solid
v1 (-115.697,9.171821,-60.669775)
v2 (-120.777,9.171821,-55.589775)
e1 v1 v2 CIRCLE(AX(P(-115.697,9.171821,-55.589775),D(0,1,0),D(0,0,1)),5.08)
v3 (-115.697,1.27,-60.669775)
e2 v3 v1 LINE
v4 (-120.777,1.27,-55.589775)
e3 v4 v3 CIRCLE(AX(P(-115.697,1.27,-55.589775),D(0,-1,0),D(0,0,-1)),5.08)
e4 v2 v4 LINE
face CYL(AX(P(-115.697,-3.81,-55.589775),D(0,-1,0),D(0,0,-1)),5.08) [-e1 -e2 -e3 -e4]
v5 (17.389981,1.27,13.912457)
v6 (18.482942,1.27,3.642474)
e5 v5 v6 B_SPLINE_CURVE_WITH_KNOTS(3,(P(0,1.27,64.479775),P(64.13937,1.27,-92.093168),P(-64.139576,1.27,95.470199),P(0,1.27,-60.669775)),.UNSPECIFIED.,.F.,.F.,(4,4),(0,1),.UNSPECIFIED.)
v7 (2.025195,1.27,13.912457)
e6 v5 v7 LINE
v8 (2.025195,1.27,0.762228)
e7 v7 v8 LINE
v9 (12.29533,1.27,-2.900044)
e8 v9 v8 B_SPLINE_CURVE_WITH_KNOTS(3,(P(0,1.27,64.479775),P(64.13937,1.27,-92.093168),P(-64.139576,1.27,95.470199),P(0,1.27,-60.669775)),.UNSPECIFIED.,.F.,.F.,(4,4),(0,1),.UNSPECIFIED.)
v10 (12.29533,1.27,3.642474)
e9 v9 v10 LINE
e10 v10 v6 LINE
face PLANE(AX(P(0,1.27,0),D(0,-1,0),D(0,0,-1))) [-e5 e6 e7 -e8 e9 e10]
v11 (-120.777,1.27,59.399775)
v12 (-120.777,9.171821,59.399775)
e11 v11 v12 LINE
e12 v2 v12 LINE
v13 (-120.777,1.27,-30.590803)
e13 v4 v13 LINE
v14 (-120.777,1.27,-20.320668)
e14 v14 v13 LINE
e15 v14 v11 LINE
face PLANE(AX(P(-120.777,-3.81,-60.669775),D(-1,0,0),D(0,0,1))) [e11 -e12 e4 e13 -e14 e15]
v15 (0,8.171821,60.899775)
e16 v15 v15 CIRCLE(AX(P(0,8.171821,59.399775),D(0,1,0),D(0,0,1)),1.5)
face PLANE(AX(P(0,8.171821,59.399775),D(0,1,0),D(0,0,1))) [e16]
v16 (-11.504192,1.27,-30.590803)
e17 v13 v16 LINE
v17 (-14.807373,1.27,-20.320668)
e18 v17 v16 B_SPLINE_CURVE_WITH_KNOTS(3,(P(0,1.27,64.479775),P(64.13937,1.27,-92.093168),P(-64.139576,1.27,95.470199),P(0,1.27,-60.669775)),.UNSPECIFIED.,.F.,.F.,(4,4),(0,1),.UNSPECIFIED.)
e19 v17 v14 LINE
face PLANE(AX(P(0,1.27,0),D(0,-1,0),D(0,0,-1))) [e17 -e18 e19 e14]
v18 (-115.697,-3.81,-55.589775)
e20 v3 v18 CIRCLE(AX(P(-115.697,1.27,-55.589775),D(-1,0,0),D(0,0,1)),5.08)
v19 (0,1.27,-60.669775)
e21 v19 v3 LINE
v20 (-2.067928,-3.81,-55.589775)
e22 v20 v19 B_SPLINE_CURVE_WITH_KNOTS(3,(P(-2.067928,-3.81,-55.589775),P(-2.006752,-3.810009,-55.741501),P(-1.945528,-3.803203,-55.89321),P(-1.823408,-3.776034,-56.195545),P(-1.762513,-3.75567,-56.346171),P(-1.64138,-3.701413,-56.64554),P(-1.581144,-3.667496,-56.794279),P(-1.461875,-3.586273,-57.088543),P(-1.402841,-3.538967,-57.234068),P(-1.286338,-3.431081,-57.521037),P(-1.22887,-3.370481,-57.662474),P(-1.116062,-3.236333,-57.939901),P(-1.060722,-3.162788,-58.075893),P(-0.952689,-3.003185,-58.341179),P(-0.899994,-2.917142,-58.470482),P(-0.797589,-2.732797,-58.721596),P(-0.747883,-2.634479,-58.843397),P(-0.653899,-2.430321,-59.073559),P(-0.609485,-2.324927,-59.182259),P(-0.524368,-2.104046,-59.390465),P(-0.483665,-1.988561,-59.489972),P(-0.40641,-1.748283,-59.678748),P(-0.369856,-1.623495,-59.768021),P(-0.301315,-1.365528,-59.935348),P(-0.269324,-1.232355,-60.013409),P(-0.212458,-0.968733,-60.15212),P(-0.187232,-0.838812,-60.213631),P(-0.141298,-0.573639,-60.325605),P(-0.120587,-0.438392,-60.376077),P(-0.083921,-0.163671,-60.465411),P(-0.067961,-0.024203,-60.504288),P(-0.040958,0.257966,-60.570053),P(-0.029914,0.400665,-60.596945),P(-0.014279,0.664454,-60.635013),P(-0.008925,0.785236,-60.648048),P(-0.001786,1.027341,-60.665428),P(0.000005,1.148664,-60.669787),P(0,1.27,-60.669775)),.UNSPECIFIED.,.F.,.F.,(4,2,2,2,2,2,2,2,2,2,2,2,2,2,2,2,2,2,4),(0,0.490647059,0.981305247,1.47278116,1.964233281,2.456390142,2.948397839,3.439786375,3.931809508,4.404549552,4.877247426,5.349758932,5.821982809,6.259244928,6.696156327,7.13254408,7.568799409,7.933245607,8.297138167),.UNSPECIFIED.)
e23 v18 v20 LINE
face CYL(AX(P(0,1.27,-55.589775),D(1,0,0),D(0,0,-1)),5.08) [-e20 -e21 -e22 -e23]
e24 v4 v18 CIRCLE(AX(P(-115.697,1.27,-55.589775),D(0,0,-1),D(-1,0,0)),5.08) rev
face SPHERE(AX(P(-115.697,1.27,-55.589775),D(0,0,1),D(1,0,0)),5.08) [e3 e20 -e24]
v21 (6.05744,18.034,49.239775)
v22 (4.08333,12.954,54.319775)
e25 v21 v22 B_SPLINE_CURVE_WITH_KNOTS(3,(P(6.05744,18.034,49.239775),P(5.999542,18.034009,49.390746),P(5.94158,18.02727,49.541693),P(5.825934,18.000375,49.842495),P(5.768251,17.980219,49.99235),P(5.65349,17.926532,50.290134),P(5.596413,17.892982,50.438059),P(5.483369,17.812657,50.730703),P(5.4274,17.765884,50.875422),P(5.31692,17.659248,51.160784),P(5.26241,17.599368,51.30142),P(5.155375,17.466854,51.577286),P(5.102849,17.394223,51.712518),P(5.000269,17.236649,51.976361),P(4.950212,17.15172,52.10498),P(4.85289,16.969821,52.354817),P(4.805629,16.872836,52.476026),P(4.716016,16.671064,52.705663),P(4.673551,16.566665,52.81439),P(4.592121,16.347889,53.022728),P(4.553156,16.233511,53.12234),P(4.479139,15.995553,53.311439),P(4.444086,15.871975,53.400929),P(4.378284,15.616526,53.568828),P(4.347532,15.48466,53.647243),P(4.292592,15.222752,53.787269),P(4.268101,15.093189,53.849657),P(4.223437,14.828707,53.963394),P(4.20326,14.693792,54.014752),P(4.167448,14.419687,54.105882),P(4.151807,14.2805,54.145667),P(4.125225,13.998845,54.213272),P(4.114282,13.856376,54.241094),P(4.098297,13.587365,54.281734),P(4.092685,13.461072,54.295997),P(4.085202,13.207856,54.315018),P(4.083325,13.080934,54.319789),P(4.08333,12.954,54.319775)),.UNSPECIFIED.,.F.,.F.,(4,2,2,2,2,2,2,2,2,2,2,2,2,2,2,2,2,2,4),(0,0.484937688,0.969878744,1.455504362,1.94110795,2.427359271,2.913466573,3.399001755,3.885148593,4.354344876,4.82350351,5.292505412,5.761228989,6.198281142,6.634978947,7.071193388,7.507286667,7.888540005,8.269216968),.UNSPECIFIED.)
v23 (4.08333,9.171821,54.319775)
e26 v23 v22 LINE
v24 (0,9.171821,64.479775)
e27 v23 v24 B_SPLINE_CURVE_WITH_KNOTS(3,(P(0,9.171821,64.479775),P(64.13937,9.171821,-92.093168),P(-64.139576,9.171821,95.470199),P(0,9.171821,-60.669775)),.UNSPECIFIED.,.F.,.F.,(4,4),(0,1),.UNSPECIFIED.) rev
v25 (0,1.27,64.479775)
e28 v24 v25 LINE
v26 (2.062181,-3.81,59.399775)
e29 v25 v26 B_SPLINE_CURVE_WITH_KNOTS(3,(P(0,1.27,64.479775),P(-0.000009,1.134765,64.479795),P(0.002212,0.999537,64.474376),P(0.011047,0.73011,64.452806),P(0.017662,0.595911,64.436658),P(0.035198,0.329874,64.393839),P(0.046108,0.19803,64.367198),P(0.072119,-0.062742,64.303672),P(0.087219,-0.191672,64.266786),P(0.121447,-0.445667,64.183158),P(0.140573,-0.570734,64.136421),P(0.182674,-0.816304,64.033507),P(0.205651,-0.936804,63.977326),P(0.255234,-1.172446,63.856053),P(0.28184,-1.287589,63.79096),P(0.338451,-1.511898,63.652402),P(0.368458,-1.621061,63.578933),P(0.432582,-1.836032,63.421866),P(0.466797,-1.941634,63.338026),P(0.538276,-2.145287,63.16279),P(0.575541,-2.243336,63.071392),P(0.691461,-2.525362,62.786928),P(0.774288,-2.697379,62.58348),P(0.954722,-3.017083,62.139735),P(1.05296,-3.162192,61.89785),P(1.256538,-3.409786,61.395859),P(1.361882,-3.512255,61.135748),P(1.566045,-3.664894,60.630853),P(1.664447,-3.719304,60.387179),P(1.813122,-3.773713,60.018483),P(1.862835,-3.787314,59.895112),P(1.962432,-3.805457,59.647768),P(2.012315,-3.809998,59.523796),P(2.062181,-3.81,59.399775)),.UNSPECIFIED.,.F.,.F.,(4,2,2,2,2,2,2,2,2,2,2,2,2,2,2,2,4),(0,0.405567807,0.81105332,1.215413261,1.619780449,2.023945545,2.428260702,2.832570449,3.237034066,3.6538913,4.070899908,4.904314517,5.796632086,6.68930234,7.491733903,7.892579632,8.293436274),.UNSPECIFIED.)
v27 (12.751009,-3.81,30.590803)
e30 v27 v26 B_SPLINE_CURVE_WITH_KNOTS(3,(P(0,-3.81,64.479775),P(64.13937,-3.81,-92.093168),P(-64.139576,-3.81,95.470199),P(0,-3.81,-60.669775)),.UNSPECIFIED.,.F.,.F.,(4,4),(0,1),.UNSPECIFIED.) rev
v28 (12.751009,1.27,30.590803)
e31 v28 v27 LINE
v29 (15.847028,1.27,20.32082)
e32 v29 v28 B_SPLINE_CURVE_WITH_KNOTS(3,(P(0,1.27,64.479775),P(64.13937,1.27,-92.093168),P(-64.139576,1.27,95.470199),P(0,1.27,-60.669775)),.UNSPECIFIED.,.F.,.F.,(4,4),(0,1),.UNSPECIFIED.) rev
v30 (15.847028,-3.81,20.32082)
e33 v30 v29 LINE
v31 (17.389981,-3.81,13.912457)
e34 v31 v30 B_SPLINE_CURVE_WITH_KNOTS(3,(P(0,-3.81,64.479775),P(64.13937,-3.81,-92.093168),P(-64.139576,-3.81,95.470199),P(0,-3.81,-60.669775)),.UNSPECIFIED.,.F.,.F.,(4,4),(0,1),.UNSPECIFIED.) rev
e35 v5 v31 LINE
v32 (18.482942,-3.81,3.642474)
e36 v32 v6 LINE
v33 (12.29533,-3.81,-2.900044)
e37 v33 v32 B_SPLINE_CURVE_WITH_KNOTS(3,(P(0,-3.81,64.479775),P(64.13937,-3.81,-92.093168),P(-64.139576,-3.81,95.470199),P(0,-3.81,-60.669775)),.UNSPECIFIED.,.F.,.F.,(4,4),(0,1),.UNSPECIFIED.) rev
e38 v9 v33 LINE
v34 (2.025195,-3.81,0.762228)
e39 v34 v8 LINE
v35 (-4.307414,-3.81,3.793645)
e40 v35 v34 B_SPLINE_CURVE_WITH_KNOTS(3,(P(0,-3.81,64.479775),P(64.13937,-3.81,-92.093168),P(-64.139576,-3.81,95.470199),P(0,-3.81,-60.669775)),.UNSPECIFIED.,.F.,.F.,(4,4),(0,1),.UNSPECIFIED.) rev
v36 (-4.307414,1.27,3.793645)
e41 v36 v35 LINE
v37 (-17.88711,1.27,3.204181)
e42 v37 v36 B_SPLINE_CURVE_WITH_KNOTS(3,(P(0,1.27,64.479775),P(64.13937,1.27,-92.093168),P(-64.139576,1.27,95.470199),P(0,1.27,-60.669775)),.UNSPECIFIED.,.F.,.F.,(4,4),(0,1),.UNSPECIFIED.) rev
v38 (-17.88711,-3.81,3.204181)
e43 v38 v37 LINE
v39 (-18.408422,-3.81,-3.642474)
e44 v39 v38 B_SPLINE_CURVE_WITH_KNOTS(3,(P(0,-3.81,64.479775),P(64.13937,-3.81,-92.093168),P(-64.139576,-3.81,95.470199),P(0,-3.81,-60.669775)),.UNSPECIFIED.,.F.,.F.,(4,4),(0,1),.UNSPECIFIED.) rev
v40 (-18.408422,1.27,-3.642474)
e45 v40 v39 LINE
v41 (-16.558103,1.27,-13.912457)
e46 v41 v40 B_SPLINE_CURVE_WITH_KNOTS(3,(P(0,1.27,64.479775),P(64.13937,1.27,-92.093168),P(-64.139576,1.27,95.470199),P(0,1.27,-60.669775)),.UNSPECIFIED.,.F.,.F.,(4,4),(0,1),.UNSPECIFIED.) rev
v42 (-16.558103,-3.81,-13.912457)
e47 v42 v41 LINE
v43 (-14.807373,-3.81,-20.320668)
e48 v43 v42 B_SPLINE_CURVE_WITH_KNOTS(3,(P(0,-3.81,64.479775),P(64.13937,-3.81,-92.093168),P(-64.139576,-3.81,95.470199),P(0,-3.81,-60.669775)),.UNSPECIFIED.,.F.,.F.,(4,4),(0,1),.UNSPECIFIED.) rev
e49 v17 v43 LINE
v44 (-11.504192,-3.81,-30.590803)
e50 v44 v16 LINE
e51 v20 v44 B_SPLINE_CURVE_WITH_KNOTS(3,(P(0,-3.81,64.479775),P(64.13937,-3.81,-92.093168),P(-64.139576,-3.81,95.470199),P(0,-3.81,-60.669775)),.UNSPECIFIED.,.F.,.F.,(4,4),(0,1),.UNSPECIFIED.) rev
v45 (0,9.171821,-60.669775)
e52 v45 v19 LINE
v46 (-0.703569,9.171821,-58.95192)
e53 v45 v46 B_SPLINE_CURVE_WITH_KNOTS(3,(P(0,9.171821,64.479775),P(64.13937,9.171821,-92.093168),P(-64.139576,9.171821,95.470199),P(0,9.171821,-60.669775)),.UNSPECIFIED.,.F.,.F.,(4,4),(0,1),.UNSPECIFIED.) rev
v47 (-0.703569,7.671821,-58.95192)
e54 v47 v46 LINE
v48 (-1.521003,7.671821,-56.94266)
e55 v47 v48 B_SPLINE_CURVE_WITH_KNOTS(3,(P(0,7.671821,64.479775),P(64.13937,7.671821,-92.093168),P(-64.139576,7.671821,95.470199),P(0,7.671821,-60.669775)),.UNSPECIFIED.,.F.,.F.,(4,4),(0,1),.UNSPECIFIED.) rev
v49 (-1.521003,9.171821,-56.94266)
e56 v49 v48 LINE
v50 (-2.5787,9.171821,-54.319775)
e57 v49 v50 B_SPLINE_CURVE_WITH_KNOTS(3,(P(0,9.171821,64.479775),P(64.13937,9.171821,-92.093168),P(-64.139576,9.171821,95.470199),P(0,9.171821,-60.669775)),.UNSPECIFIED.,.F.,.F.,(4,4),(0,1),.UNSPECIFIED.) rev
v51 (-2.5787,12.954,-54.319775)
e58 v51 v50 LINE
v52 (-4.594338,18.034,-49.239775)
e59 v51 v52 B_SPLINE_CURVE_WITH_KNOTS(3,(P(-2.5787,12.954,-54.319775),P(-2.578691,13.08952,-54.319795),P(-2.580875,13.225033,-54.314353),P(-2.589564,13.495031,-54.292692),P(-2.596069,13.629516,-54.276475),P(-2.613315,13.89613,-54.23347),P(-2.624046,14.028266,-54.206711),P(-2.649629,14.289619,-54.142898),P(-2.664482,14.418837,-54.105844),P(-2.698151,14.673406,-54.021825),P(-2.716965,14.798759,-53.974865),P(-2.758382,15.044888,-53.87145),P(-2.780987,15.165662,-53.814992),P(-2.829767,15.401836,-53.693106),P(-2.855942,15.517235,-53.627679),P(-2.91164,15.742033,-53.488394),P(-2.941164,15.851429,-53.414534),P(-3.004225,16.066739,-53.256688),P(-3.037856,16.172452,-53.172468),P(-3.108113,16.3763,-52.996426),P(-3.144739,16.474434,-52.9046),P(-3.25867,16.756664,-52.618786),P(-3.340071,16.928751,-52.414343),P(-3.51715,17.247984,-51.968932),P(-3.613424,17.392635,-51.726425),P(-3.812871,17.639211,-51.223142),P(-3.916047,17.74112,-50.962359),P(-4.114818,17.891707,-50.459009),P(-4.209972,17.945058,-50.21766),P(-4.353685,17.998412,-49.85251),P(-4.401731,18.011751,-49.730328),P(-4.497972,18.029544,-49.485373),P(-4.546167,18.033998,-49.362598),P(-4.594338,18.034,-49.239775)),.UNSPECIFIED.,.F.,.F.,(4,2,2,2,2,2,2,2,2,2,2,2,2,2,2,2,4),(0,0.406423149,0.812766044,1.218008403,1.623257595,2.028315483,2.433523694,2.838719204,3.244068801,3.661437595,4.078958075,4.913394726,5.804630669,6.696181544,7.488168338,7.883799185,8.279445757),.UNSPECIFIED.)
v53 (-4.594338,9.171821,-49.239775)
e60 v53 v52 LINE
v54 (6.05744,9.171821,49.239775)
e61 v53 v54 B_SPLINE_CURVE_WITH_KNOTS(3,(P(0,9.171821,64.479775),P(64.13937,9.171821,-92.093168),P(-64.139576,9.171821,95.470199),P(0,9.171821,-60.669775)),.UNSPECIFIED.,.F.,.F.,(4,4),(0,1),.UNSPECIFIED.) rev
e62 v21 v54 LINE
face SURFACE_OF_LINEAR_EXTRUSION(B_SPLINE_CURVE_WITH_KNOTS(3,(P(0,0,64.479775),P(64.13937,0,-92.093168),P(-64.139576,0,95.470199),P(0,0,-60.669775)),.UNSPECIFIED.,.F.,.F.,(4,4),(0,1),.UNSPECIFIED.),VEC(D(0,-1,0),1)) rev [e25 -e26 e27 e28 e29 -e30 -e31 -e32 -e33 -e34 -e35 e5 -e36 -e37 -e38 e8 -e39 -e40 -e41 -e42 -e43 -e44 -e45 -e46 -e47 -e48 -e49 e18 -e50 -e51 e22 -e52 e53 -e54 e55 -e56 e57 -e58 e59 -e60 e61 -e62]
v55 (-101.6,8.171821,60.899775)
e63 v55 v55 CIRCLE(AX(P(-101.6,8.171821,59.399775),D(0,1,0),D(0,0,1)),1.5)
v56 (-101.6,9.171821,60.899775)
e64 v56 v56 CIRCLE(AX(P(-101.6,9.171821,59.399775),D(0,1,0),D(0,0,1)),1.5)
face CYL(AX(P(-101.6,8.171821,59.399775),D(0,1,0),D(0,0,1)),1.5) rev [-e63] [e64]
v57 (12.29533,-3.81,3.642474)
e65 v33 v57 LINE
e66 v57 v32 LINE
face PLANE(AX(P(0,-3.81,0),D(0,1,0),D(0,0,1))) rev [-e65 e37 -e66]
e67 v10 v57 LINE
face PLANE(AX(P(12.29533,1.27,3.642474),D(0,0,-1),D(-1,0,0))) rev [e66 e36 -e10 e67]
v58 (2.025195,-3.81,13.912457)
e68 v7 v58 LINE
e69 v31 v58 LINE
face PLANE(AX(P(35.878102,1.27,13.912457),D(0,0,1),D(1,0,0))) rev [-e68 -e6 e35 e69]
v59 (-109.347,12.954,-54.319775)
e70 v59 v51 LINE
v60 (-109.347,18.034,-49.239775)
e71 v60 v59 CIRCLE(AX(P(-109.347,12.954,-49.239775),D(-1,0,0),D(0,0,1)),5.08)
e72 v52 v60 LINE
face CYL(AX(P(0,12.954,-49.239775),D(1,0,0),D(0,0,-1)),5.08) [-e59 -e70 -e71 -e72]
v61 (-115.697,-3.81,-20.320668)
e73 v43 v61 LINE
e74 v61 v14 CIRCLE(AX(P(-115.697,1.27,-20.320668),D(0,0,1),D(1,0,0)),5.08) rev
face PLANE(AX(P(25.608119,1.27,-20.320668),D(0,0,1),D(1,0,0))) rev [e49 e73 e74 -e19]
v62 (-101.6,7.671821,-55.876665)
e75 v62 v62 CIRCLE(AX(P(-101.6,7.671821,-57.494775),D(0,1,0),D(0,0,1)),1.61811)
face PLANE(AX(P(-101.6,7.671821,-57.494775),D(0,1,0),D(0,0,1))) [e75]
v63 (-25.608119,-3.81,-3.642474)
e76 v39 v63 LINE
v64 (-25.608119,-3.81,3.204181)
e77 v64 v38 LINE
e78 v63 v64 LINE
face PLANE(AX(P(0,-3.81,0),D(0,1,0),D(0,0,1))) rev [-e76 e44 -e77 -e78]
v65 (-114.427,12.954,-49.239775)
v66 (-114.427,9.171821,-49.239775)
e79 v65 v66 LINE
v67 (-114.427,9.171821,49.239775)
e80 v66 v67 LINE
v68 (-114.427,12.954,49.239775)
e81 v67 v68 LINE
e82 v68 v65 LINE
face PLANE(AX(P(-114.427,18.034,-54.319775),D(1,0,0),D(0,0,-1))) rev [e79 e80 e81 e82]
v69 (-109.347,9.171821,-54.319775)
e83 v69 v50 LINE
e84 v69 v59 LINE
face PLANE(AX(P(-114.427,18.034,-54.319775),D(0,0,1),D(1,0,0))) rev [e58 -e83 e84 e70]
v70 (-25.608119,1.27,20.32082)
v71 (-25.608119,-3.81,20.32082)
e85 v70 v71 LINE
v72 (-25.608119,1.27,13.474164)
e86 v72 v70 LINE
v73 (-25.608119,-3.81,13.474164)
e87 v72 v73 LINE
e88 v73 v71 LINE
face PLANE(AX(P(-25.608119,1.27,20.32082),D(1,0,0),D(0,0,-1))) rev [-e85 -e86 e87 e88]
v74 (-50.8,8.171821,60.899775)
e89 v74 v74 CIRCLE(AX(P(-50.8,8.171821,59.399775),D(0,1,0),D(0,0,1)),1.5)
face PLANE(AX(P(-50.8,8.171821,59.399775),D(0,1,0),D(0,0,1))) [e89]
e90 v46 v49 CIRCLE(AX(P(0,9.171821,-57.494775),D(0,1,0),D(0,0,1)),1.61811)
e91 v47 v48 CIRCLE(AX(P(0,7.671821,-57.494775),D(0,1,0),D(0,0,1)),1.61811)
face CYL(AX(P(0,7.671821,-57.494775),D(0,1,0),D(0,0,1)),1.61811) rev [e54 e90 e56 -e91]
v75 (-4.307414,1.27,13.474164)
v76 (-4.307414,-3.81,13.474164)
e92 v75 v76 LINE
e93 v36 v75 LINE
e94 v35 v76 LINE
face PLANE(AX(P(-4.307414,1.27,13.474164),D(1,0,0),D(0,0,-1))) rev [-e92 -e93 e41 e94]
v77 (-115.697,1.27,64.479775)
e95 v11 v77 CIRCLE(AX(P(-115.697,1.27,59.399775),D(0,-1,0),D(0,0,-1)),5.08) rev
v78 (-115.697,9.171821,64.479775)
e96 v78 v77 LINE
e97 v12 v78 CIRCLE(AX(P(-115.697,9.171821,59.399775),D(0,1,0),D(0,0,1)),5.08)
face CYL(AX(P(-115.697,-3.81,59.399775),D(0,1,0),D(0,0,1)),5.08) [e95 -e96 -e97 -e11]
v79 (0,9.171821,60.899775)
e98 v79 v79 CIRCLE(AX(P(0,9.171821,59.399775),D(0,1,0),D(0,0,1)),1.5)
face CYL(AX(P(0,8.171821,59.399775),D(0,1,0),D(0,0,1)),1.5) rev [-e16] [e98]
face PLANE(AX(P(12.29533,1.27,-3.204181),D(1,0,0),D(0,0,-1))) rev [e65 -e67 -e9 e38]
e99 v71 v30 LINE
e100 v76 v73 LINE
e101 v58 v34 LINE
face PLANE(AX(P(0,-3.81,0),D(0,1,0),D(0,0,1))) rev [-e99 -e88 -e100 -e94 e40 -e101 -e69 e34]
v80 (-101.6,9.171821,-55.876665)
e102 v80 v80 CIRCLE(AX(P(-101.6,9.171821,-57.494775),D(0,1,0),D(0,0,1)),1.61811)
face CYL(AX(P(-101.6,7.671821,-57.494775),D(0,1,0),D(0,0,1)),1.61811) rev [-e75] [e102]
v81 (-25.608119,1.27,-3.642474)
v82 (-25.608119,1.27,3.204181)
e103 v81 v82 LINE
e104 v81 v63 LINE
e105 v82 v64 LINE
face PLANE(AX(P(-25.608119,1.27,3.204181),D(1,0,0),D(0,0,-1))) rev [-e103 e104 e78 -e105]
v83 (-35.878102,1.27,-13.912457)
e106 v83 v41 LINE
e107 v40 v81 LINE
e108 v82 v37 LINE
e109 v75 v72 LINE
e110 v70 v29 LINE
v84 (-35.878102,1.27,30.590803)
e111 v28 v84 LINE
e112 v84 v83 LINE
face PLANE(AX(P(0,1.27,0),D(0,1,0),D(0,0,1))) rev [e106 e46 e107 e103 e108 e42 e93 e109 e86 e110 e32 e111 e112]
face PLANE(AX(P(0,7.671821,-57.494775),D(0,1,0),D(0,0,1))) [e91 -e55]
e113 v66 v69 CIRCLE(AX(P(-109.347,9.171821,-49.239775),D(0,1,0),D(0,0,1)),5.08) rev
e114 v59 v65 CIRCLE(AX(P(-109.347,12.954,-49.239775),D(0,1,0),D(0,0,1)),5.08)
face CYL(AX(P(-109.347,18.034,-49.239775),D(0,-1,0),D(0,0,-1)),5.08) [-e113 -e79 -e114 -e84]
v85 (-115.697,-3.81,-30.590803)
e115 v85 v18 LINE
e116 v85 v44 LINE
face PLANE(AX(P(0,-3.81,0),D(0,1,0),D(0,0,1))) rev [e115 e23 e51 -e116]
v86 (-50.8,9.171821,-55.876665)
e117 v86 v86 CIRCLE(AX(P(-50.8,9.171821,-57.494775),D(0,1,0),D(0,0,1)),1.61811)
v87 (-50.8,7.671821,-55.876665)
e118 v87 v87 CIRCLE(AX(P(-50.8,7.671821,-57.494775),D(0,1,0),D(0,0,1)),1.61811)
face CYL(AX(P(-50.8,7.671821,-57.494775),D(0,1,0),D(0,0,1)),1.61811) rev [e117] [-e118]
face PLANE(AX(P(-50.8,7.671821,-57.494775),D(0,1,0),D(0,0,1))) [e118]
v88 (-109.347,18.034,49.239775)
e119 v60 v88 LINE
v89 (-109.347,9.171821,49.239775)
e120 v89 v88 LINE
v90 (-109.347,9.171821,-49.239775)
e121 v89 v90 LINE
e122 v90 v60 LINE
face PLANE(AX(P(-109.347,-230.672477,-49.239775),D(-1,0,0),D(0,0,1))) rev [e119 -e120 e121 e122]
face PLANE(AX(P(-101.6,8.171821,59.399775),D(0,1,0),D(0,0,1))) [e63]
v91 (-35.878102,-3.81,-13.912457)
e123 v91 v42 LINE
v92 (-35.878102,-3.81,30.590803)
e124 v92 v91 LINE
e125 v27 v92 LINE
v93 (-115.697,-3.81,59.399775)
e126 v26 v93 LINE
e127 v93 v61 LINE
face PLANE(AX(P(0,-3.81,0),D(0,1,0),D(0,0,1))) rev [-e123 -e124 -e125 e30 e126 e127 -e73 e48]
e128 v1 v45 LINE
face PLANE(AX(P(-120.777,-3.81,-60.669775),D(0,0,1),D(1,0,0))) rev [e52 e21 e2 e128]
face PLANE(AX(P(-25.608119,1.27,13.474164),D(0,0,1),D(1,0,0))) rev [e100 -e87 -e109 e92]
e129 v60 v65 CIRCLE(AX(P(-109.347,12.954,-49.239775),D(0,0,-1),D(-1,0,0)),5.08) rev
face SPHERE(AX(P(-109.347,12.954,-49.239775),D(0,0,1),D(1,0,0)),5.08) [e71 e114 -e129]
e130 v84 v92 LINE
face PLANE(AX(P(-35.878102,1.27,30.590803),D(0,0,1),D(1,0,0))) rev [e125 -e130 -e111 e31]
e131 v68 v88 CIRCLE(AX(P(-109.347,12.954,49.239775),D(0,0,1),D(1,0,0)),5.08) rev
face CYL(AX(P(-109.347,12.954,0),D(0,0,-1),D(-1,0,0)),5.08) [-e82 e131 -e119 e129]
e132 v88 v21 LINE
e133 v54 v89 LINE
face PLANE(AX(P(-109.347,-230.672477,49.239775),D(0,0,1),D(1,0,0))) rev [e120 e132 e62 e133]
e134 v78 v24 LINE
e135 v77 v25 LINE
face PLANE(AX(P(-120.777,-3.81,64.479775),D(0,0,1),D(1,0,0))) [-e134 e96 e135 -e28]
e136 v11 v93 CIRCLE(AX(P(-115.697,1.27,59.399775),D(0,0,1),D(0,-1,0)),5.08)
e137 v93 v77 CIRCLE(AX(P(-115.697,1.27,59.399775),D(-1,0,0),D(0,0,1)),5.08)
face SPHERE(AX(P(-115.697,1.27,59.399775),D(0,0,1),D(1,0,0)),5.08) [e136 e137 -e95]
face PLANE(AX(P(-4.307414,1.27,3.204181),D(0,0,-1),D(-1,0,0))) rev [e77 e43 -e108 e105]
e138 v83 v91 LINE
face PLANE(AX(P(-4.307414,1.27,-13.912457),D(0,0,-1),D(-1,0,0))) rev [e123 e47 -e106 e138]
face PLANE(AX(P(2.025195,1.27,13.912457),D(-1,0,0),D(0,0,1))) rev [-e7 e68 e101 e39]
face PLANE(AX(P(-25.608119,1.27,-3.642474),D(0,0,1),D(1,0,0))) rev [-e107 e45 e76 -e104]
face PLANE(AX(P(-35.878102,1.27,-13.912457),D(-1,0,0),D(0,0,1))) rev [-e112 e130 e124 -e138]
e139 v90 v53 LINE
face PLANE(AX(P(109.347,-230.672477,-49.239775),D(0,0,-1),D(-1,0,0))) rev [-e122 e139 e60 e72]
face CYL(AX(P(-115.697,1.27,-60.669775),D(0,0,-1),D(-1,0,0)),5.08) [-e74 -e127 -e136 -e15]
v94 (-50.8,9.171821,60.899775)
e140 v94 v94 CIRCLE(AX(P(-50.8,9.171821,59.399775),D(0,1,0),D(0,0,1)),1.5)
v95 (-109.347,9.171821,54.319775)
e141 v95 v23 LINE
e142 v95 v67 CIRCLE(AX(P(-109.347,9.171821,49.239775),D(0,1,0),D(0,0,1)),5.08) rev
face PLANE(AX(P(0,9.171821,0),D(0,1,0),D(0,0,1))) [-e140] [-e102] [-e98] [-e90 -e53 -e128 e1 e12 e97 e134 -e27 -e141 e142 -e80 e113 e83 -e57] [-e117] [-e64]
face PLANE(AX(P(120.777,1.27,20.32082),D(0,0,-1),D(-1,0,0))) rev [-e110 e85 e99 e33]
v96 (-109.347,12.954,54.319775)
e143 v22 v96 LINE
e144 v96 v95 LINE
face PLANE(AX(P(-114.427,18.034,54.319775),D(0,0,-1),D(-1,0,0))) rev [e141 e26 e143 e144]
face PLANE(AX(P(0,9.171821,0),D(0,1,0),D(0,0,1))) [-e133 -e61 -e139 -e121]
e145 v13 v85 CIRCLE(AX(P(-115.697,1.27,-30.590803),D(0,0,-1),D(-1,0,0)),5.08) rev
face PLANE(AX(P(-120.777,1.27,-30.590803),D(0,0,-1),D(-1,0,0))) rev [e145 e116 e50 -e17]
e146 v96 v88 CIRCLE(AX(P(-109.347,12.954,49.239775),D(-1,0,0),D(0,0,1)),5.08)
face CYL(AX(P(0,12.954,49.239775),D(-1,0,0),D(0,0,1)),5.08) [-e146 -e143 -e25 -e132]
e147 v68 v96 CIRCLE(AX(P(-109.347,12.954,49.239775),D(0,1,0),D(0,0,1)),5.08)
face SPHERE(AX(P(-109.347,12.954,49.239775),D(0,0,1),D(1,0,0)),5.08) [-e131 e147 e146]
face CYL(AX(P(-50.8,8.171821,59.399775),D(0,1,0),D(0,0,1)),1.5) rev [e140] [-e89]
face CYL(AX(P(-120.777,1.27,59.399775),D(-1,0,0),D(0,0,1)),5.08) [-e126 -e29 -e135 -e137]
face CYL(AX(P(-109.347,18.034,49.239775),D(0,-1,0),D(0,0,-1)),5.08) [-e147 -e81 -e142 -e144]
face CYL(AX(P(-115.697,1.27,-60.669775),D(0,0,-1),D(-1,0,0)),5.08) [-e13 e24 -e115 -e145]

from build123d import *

# Parameters (mm, degrees)
SKETCH1_14_W         = 241.554
SKETCH1_14_H         = 125.149549896
BOSS_EXTRUDE9_DEPTH  = 3.81
SKETCH1_W            = 241.554
SKETCH1_H            = 125.149549896
SKETCH1_W_2          = 228.854
SKETCH1_H_2          = 108.639549896
BOSS_EXTRUDE10_DEPTH = 9.171821007
SKETCH29_R           = 1.61811024
CUT_EXTRUDE12_DEPTH  = 1.5
LPATTERN24_COUNT     = 3
LPATTERN24_PITCH     = 50.8
LPATTERN25_COUNT     = 3
LPATTERN25_PITCH     = 50.8
SKETCH30_R           = 1.5
CUT_EXTRUDE13_DEPTH  = 1
LPATTERN26_COUNT     = 3
LPATTERN26_PITCH     = 50.8
LPATTERN27_COUNT     = 3
LPATTERN27_PITCH     = 50.8
SKETCH37_W           = 228.854
SKETCH37_H           = 108.639549896
BOSS_EXTRUDE12_DEPTH = 18.034
FILLET7_R            = 5.08
SKETCH38_W           = 218.694
SKETCH38_H           = 98.479549896
CUT_EXTRUDE14_DEPTH  = 8.862178993
CUT_EXTRUDE15_DEPTH  = 5.08
SURFACECUT1_START    = -3.81
SURFACECUT1_DEPTH    = 21.844


# Read off the part's stored shape, not the designer's step: SurfaceCut1
with BuildPart() as part:
    # Sketch1<14> → Boss-Extrude9 (new body)
    with BuildSketch(Plane(origin=(0, 0, 0), x_dir=(1, 0, 0), z_dir=(0, 1, 0))):
        with Locations((0, -1.905)):
            Rectangle(SKETCH1_14_W, SKETCH1_14_H)
    extrude(amount=-BOSS_EXTRUDE9_DEPTH)

    # Sketch1 → Boss-Extrude10 (add)
    with BuildSketch(Plane(origin=(0, 0, 0), x_dir=(1, 0, 0), z_dir=(0, 1, 0))):
        with Locations((0, -1.905)):
            Rectangle(SKETCH1_W, SKETCH1_H)
        Rectangle(SKETCH1_W_2, SKETCH1_H_2, mode=Mode.SUBTRACT)
    extrude(amount=BOSS_EXTRUDE10_DEPTH)

    # Sketch29 → Cut-Extrude12 (cut)
    with BuildSketch(Plane(origin=(0, 9.171821007, 0), x_dir=(1, 0, 0), z_dir=(0, 1, 0))):
        with Locations(Location((0, 57.494774948, 0), (0, 0, 270))):
            Circle(SKETCH29_R)
    cut_extrude12 = extrude(amount=-CUT_EXTRUDE12_DEPTH, mode=Mode.SUBTRACT)

    # LPattern24: Cut-Extrude12 ×3
    with Locations(*[(-i * LPATTERN24_PITCH, 0, 0) for i in range(1, LPATTERN24_COUNT)]):
        add(cut_extrude12, mode=Mode.SUBTRACT)

    # LPattern25: Cut-Extrude12 ×3
    with Locations(*[(i * LPATTERN25_PITCH, 0, 0) for i in range(1, LPATTERN25_COUNT)]):
        add(cut_extrude12, mode=Mode.SUBTRACT)

    # Sketch30 → Cut-Extrude13 (cut)
    with BuildSketch(Plane(origin=(0, 9.171821007, 0), x_dir=(1, 0, 0), z_dir=(0, 1, 0))):
        with Locations(Location((0, -59.399774948, 0), (0, 0, 270))):
            Circle(SKETCH30_R)
    cut_extrude13 = extrude(amount=-CUT_EXTRUDE13_DEPTH, mode=Mode.SUBTRACT)

    # LPattern26: Cut-Extrude13 ×3
    with Locations(*[(i * LPATTERN26_PITCH, 0, 0) for i in range(1, LPATTERN26_COUNT)]):
        add(cut_extrude13, mode=Mode.SUBTRACT)

    # LPattern27: Cut-Extrude13 ×3
    with Locations(*[(-i * LPATTERN27_PITCH, 0, 0) for i in range(1, LPATTERN27_COUNT)]):
        add(cut_extrude13, mode=Mode.SUBTRACT)

    # Sketch37 → Boss-Extrude12 (add)
    with BuildSketch(Plane(origin=(0, 0, 0), x_dir=(1, 0, 0), z_dir=(0, 1, 0))):
        Rectangle(SKETCH37_W, SKETCH37_H)
    extrude(amount=BOSS_EXTRUDE12_DEPTH)

    # Fillet7
    fillet7_edges = [part.edges().sort_by_distance(p)[0] for p in [
        (120.777, -3.81, 1.905),
        (0, -3.81, -60.669774948),
        (-120.777, -3.81, 1.905),
        (0, -3.81, 64.479774948),
        (-120.777, 2.680910504, -60.669774948),
        (-114.427, 13.602910504, -54.319774948),
        (120.777, 2.680910504, -60.669774948),
        (-114.427, 13.602910504, 54.319774948),
        (114.427, 13.602910504, 54.319774948),
        (114.427, 13.602910504, -54.319774948),
        (-114.427, 18.034, 0),
        (0, 18.034, 54.319774948),
        (114.427, 18.034, 0),
        (120.777, 2.680910504, 64.479774948),
        (0, 18.034, -54.319774948),
        (-120.777, 2.680910504, 64.479774948),
    ]]
    fillet(fillet7_edges, radius=FILLET7_R)

    # Sketch38 → Cut-Extrude14 (cut)
    with BuildSketch(Plane(origin=(0, 18.034, 0), x_dir=(1, 0, 0), z_dir=(0, 1, 0))):
        Rectangle(SKETCH38_W, SKETCH38_H)
    extrude(amount=-CUT_EXTRUDE14_DEPTH, mode=Mode.SUBTRACT)

    # Sketch40 → Cut-Extrude15 (cut)
    with BuildSketch(Plane.XZ.offset(3.81)):
        Polygon((-35.878101968, 30.590802731), (120.777, 30.590802731), (120.777, 20.320819759), (-25.608118996, 20.320819759), (-25.608118996, 13.474164444), (-4.307413572, 13.474164444), (-4.307413572, 3.204181472), (-25.608118996, 3.204181472), (-25.608118996, -3.642473843), (-4.307413572, -3.642473843), (-4.307413572, -13.912456815), (-35.878101968, -13.912456815), align=None)
        Polygon((35.878101968, -3.204181472), (12.295330254, -3.204181472), (12.295330254, 3.642473843), (35.878101968, 3.642473843), (35.878101968, 13.912456815), (2.025195134, 13.912456815), (2.025195134, -13.474164444), (25.608118996, -13.474164444), (25.608118996, -20.320667611), (-120.777, -20.320667611), (-120.777, -30.590802731), (35.878101968, -30.590802731), align=None)
    extrude(amount=-CUT_EXTRUDE15_DEPTH, mode=Mode.SUBTRACT)

    # SurfaceCut1 outline → SurfaceCut1 (cut)
    with BuildSketch(Plane(origin=(0, 0, 0), x_dir=(1, 0, 0), z_dir=(0, 1, 0)).offset(SURFACECUT1_START)):
        with BuildLine():
            Line((0, -64.479774948), (115.697, -64.479774948))
            ThreePointArc((115.697, -64.479774948), (119.289102448, -62.991877396), (120.777, -59.399774948))
            Line((120.777, -59.399774948), (120.777, 55.589774948))
            ThreePointArc((120.777, 55.589774948), (119.289102448, 59.181877396), (115.697, 60.669774948))
            Line((115.697, 60.669774948), (0, 60.669774948))
            add(Edge.make_bspline(
                [(0, 60.669774948), (-4.900958952, 48.738988323), (-8.678459932, 38.81495371), (-11.504191584, 30.590802731)],
                knots=[0.996302642, 0.996302642, 0.996302642, 0.996302642, 1.072713483, 1.072713483, 1.072713483, 1.072713483], degree=3))
            add(Edge.make_bspline(
                [(-11.504191584, 30.590802731), (-18.142241768, 11.271088885), (-19.527974886, 1.332143628), (-17.887110358, -3.204181472)],
                knots=[0.888553663, 0.888553663, 0.888553663, 0.888553663, 1.068053721, 1.068053721, 1.068053721, 1.068053721], degree=3))
            add(Edge.make_bspline(
                [(-17.887110358, -3.204181472), (-11.085165947, -22.008799781), (47.725405996, 52.02444551), (0, -64.479774948)],
                knots=[0.478911773, 0.478911773, 0.478911773, 0.478911773, 1.223000875, 1.223000875, 1.223000875, 1.223000875], degree=3))
        make_face()
    extrude(amount=SURFACECUT1_DEPTH, mode=Mode.SUBTRACT)


solid = part.part
